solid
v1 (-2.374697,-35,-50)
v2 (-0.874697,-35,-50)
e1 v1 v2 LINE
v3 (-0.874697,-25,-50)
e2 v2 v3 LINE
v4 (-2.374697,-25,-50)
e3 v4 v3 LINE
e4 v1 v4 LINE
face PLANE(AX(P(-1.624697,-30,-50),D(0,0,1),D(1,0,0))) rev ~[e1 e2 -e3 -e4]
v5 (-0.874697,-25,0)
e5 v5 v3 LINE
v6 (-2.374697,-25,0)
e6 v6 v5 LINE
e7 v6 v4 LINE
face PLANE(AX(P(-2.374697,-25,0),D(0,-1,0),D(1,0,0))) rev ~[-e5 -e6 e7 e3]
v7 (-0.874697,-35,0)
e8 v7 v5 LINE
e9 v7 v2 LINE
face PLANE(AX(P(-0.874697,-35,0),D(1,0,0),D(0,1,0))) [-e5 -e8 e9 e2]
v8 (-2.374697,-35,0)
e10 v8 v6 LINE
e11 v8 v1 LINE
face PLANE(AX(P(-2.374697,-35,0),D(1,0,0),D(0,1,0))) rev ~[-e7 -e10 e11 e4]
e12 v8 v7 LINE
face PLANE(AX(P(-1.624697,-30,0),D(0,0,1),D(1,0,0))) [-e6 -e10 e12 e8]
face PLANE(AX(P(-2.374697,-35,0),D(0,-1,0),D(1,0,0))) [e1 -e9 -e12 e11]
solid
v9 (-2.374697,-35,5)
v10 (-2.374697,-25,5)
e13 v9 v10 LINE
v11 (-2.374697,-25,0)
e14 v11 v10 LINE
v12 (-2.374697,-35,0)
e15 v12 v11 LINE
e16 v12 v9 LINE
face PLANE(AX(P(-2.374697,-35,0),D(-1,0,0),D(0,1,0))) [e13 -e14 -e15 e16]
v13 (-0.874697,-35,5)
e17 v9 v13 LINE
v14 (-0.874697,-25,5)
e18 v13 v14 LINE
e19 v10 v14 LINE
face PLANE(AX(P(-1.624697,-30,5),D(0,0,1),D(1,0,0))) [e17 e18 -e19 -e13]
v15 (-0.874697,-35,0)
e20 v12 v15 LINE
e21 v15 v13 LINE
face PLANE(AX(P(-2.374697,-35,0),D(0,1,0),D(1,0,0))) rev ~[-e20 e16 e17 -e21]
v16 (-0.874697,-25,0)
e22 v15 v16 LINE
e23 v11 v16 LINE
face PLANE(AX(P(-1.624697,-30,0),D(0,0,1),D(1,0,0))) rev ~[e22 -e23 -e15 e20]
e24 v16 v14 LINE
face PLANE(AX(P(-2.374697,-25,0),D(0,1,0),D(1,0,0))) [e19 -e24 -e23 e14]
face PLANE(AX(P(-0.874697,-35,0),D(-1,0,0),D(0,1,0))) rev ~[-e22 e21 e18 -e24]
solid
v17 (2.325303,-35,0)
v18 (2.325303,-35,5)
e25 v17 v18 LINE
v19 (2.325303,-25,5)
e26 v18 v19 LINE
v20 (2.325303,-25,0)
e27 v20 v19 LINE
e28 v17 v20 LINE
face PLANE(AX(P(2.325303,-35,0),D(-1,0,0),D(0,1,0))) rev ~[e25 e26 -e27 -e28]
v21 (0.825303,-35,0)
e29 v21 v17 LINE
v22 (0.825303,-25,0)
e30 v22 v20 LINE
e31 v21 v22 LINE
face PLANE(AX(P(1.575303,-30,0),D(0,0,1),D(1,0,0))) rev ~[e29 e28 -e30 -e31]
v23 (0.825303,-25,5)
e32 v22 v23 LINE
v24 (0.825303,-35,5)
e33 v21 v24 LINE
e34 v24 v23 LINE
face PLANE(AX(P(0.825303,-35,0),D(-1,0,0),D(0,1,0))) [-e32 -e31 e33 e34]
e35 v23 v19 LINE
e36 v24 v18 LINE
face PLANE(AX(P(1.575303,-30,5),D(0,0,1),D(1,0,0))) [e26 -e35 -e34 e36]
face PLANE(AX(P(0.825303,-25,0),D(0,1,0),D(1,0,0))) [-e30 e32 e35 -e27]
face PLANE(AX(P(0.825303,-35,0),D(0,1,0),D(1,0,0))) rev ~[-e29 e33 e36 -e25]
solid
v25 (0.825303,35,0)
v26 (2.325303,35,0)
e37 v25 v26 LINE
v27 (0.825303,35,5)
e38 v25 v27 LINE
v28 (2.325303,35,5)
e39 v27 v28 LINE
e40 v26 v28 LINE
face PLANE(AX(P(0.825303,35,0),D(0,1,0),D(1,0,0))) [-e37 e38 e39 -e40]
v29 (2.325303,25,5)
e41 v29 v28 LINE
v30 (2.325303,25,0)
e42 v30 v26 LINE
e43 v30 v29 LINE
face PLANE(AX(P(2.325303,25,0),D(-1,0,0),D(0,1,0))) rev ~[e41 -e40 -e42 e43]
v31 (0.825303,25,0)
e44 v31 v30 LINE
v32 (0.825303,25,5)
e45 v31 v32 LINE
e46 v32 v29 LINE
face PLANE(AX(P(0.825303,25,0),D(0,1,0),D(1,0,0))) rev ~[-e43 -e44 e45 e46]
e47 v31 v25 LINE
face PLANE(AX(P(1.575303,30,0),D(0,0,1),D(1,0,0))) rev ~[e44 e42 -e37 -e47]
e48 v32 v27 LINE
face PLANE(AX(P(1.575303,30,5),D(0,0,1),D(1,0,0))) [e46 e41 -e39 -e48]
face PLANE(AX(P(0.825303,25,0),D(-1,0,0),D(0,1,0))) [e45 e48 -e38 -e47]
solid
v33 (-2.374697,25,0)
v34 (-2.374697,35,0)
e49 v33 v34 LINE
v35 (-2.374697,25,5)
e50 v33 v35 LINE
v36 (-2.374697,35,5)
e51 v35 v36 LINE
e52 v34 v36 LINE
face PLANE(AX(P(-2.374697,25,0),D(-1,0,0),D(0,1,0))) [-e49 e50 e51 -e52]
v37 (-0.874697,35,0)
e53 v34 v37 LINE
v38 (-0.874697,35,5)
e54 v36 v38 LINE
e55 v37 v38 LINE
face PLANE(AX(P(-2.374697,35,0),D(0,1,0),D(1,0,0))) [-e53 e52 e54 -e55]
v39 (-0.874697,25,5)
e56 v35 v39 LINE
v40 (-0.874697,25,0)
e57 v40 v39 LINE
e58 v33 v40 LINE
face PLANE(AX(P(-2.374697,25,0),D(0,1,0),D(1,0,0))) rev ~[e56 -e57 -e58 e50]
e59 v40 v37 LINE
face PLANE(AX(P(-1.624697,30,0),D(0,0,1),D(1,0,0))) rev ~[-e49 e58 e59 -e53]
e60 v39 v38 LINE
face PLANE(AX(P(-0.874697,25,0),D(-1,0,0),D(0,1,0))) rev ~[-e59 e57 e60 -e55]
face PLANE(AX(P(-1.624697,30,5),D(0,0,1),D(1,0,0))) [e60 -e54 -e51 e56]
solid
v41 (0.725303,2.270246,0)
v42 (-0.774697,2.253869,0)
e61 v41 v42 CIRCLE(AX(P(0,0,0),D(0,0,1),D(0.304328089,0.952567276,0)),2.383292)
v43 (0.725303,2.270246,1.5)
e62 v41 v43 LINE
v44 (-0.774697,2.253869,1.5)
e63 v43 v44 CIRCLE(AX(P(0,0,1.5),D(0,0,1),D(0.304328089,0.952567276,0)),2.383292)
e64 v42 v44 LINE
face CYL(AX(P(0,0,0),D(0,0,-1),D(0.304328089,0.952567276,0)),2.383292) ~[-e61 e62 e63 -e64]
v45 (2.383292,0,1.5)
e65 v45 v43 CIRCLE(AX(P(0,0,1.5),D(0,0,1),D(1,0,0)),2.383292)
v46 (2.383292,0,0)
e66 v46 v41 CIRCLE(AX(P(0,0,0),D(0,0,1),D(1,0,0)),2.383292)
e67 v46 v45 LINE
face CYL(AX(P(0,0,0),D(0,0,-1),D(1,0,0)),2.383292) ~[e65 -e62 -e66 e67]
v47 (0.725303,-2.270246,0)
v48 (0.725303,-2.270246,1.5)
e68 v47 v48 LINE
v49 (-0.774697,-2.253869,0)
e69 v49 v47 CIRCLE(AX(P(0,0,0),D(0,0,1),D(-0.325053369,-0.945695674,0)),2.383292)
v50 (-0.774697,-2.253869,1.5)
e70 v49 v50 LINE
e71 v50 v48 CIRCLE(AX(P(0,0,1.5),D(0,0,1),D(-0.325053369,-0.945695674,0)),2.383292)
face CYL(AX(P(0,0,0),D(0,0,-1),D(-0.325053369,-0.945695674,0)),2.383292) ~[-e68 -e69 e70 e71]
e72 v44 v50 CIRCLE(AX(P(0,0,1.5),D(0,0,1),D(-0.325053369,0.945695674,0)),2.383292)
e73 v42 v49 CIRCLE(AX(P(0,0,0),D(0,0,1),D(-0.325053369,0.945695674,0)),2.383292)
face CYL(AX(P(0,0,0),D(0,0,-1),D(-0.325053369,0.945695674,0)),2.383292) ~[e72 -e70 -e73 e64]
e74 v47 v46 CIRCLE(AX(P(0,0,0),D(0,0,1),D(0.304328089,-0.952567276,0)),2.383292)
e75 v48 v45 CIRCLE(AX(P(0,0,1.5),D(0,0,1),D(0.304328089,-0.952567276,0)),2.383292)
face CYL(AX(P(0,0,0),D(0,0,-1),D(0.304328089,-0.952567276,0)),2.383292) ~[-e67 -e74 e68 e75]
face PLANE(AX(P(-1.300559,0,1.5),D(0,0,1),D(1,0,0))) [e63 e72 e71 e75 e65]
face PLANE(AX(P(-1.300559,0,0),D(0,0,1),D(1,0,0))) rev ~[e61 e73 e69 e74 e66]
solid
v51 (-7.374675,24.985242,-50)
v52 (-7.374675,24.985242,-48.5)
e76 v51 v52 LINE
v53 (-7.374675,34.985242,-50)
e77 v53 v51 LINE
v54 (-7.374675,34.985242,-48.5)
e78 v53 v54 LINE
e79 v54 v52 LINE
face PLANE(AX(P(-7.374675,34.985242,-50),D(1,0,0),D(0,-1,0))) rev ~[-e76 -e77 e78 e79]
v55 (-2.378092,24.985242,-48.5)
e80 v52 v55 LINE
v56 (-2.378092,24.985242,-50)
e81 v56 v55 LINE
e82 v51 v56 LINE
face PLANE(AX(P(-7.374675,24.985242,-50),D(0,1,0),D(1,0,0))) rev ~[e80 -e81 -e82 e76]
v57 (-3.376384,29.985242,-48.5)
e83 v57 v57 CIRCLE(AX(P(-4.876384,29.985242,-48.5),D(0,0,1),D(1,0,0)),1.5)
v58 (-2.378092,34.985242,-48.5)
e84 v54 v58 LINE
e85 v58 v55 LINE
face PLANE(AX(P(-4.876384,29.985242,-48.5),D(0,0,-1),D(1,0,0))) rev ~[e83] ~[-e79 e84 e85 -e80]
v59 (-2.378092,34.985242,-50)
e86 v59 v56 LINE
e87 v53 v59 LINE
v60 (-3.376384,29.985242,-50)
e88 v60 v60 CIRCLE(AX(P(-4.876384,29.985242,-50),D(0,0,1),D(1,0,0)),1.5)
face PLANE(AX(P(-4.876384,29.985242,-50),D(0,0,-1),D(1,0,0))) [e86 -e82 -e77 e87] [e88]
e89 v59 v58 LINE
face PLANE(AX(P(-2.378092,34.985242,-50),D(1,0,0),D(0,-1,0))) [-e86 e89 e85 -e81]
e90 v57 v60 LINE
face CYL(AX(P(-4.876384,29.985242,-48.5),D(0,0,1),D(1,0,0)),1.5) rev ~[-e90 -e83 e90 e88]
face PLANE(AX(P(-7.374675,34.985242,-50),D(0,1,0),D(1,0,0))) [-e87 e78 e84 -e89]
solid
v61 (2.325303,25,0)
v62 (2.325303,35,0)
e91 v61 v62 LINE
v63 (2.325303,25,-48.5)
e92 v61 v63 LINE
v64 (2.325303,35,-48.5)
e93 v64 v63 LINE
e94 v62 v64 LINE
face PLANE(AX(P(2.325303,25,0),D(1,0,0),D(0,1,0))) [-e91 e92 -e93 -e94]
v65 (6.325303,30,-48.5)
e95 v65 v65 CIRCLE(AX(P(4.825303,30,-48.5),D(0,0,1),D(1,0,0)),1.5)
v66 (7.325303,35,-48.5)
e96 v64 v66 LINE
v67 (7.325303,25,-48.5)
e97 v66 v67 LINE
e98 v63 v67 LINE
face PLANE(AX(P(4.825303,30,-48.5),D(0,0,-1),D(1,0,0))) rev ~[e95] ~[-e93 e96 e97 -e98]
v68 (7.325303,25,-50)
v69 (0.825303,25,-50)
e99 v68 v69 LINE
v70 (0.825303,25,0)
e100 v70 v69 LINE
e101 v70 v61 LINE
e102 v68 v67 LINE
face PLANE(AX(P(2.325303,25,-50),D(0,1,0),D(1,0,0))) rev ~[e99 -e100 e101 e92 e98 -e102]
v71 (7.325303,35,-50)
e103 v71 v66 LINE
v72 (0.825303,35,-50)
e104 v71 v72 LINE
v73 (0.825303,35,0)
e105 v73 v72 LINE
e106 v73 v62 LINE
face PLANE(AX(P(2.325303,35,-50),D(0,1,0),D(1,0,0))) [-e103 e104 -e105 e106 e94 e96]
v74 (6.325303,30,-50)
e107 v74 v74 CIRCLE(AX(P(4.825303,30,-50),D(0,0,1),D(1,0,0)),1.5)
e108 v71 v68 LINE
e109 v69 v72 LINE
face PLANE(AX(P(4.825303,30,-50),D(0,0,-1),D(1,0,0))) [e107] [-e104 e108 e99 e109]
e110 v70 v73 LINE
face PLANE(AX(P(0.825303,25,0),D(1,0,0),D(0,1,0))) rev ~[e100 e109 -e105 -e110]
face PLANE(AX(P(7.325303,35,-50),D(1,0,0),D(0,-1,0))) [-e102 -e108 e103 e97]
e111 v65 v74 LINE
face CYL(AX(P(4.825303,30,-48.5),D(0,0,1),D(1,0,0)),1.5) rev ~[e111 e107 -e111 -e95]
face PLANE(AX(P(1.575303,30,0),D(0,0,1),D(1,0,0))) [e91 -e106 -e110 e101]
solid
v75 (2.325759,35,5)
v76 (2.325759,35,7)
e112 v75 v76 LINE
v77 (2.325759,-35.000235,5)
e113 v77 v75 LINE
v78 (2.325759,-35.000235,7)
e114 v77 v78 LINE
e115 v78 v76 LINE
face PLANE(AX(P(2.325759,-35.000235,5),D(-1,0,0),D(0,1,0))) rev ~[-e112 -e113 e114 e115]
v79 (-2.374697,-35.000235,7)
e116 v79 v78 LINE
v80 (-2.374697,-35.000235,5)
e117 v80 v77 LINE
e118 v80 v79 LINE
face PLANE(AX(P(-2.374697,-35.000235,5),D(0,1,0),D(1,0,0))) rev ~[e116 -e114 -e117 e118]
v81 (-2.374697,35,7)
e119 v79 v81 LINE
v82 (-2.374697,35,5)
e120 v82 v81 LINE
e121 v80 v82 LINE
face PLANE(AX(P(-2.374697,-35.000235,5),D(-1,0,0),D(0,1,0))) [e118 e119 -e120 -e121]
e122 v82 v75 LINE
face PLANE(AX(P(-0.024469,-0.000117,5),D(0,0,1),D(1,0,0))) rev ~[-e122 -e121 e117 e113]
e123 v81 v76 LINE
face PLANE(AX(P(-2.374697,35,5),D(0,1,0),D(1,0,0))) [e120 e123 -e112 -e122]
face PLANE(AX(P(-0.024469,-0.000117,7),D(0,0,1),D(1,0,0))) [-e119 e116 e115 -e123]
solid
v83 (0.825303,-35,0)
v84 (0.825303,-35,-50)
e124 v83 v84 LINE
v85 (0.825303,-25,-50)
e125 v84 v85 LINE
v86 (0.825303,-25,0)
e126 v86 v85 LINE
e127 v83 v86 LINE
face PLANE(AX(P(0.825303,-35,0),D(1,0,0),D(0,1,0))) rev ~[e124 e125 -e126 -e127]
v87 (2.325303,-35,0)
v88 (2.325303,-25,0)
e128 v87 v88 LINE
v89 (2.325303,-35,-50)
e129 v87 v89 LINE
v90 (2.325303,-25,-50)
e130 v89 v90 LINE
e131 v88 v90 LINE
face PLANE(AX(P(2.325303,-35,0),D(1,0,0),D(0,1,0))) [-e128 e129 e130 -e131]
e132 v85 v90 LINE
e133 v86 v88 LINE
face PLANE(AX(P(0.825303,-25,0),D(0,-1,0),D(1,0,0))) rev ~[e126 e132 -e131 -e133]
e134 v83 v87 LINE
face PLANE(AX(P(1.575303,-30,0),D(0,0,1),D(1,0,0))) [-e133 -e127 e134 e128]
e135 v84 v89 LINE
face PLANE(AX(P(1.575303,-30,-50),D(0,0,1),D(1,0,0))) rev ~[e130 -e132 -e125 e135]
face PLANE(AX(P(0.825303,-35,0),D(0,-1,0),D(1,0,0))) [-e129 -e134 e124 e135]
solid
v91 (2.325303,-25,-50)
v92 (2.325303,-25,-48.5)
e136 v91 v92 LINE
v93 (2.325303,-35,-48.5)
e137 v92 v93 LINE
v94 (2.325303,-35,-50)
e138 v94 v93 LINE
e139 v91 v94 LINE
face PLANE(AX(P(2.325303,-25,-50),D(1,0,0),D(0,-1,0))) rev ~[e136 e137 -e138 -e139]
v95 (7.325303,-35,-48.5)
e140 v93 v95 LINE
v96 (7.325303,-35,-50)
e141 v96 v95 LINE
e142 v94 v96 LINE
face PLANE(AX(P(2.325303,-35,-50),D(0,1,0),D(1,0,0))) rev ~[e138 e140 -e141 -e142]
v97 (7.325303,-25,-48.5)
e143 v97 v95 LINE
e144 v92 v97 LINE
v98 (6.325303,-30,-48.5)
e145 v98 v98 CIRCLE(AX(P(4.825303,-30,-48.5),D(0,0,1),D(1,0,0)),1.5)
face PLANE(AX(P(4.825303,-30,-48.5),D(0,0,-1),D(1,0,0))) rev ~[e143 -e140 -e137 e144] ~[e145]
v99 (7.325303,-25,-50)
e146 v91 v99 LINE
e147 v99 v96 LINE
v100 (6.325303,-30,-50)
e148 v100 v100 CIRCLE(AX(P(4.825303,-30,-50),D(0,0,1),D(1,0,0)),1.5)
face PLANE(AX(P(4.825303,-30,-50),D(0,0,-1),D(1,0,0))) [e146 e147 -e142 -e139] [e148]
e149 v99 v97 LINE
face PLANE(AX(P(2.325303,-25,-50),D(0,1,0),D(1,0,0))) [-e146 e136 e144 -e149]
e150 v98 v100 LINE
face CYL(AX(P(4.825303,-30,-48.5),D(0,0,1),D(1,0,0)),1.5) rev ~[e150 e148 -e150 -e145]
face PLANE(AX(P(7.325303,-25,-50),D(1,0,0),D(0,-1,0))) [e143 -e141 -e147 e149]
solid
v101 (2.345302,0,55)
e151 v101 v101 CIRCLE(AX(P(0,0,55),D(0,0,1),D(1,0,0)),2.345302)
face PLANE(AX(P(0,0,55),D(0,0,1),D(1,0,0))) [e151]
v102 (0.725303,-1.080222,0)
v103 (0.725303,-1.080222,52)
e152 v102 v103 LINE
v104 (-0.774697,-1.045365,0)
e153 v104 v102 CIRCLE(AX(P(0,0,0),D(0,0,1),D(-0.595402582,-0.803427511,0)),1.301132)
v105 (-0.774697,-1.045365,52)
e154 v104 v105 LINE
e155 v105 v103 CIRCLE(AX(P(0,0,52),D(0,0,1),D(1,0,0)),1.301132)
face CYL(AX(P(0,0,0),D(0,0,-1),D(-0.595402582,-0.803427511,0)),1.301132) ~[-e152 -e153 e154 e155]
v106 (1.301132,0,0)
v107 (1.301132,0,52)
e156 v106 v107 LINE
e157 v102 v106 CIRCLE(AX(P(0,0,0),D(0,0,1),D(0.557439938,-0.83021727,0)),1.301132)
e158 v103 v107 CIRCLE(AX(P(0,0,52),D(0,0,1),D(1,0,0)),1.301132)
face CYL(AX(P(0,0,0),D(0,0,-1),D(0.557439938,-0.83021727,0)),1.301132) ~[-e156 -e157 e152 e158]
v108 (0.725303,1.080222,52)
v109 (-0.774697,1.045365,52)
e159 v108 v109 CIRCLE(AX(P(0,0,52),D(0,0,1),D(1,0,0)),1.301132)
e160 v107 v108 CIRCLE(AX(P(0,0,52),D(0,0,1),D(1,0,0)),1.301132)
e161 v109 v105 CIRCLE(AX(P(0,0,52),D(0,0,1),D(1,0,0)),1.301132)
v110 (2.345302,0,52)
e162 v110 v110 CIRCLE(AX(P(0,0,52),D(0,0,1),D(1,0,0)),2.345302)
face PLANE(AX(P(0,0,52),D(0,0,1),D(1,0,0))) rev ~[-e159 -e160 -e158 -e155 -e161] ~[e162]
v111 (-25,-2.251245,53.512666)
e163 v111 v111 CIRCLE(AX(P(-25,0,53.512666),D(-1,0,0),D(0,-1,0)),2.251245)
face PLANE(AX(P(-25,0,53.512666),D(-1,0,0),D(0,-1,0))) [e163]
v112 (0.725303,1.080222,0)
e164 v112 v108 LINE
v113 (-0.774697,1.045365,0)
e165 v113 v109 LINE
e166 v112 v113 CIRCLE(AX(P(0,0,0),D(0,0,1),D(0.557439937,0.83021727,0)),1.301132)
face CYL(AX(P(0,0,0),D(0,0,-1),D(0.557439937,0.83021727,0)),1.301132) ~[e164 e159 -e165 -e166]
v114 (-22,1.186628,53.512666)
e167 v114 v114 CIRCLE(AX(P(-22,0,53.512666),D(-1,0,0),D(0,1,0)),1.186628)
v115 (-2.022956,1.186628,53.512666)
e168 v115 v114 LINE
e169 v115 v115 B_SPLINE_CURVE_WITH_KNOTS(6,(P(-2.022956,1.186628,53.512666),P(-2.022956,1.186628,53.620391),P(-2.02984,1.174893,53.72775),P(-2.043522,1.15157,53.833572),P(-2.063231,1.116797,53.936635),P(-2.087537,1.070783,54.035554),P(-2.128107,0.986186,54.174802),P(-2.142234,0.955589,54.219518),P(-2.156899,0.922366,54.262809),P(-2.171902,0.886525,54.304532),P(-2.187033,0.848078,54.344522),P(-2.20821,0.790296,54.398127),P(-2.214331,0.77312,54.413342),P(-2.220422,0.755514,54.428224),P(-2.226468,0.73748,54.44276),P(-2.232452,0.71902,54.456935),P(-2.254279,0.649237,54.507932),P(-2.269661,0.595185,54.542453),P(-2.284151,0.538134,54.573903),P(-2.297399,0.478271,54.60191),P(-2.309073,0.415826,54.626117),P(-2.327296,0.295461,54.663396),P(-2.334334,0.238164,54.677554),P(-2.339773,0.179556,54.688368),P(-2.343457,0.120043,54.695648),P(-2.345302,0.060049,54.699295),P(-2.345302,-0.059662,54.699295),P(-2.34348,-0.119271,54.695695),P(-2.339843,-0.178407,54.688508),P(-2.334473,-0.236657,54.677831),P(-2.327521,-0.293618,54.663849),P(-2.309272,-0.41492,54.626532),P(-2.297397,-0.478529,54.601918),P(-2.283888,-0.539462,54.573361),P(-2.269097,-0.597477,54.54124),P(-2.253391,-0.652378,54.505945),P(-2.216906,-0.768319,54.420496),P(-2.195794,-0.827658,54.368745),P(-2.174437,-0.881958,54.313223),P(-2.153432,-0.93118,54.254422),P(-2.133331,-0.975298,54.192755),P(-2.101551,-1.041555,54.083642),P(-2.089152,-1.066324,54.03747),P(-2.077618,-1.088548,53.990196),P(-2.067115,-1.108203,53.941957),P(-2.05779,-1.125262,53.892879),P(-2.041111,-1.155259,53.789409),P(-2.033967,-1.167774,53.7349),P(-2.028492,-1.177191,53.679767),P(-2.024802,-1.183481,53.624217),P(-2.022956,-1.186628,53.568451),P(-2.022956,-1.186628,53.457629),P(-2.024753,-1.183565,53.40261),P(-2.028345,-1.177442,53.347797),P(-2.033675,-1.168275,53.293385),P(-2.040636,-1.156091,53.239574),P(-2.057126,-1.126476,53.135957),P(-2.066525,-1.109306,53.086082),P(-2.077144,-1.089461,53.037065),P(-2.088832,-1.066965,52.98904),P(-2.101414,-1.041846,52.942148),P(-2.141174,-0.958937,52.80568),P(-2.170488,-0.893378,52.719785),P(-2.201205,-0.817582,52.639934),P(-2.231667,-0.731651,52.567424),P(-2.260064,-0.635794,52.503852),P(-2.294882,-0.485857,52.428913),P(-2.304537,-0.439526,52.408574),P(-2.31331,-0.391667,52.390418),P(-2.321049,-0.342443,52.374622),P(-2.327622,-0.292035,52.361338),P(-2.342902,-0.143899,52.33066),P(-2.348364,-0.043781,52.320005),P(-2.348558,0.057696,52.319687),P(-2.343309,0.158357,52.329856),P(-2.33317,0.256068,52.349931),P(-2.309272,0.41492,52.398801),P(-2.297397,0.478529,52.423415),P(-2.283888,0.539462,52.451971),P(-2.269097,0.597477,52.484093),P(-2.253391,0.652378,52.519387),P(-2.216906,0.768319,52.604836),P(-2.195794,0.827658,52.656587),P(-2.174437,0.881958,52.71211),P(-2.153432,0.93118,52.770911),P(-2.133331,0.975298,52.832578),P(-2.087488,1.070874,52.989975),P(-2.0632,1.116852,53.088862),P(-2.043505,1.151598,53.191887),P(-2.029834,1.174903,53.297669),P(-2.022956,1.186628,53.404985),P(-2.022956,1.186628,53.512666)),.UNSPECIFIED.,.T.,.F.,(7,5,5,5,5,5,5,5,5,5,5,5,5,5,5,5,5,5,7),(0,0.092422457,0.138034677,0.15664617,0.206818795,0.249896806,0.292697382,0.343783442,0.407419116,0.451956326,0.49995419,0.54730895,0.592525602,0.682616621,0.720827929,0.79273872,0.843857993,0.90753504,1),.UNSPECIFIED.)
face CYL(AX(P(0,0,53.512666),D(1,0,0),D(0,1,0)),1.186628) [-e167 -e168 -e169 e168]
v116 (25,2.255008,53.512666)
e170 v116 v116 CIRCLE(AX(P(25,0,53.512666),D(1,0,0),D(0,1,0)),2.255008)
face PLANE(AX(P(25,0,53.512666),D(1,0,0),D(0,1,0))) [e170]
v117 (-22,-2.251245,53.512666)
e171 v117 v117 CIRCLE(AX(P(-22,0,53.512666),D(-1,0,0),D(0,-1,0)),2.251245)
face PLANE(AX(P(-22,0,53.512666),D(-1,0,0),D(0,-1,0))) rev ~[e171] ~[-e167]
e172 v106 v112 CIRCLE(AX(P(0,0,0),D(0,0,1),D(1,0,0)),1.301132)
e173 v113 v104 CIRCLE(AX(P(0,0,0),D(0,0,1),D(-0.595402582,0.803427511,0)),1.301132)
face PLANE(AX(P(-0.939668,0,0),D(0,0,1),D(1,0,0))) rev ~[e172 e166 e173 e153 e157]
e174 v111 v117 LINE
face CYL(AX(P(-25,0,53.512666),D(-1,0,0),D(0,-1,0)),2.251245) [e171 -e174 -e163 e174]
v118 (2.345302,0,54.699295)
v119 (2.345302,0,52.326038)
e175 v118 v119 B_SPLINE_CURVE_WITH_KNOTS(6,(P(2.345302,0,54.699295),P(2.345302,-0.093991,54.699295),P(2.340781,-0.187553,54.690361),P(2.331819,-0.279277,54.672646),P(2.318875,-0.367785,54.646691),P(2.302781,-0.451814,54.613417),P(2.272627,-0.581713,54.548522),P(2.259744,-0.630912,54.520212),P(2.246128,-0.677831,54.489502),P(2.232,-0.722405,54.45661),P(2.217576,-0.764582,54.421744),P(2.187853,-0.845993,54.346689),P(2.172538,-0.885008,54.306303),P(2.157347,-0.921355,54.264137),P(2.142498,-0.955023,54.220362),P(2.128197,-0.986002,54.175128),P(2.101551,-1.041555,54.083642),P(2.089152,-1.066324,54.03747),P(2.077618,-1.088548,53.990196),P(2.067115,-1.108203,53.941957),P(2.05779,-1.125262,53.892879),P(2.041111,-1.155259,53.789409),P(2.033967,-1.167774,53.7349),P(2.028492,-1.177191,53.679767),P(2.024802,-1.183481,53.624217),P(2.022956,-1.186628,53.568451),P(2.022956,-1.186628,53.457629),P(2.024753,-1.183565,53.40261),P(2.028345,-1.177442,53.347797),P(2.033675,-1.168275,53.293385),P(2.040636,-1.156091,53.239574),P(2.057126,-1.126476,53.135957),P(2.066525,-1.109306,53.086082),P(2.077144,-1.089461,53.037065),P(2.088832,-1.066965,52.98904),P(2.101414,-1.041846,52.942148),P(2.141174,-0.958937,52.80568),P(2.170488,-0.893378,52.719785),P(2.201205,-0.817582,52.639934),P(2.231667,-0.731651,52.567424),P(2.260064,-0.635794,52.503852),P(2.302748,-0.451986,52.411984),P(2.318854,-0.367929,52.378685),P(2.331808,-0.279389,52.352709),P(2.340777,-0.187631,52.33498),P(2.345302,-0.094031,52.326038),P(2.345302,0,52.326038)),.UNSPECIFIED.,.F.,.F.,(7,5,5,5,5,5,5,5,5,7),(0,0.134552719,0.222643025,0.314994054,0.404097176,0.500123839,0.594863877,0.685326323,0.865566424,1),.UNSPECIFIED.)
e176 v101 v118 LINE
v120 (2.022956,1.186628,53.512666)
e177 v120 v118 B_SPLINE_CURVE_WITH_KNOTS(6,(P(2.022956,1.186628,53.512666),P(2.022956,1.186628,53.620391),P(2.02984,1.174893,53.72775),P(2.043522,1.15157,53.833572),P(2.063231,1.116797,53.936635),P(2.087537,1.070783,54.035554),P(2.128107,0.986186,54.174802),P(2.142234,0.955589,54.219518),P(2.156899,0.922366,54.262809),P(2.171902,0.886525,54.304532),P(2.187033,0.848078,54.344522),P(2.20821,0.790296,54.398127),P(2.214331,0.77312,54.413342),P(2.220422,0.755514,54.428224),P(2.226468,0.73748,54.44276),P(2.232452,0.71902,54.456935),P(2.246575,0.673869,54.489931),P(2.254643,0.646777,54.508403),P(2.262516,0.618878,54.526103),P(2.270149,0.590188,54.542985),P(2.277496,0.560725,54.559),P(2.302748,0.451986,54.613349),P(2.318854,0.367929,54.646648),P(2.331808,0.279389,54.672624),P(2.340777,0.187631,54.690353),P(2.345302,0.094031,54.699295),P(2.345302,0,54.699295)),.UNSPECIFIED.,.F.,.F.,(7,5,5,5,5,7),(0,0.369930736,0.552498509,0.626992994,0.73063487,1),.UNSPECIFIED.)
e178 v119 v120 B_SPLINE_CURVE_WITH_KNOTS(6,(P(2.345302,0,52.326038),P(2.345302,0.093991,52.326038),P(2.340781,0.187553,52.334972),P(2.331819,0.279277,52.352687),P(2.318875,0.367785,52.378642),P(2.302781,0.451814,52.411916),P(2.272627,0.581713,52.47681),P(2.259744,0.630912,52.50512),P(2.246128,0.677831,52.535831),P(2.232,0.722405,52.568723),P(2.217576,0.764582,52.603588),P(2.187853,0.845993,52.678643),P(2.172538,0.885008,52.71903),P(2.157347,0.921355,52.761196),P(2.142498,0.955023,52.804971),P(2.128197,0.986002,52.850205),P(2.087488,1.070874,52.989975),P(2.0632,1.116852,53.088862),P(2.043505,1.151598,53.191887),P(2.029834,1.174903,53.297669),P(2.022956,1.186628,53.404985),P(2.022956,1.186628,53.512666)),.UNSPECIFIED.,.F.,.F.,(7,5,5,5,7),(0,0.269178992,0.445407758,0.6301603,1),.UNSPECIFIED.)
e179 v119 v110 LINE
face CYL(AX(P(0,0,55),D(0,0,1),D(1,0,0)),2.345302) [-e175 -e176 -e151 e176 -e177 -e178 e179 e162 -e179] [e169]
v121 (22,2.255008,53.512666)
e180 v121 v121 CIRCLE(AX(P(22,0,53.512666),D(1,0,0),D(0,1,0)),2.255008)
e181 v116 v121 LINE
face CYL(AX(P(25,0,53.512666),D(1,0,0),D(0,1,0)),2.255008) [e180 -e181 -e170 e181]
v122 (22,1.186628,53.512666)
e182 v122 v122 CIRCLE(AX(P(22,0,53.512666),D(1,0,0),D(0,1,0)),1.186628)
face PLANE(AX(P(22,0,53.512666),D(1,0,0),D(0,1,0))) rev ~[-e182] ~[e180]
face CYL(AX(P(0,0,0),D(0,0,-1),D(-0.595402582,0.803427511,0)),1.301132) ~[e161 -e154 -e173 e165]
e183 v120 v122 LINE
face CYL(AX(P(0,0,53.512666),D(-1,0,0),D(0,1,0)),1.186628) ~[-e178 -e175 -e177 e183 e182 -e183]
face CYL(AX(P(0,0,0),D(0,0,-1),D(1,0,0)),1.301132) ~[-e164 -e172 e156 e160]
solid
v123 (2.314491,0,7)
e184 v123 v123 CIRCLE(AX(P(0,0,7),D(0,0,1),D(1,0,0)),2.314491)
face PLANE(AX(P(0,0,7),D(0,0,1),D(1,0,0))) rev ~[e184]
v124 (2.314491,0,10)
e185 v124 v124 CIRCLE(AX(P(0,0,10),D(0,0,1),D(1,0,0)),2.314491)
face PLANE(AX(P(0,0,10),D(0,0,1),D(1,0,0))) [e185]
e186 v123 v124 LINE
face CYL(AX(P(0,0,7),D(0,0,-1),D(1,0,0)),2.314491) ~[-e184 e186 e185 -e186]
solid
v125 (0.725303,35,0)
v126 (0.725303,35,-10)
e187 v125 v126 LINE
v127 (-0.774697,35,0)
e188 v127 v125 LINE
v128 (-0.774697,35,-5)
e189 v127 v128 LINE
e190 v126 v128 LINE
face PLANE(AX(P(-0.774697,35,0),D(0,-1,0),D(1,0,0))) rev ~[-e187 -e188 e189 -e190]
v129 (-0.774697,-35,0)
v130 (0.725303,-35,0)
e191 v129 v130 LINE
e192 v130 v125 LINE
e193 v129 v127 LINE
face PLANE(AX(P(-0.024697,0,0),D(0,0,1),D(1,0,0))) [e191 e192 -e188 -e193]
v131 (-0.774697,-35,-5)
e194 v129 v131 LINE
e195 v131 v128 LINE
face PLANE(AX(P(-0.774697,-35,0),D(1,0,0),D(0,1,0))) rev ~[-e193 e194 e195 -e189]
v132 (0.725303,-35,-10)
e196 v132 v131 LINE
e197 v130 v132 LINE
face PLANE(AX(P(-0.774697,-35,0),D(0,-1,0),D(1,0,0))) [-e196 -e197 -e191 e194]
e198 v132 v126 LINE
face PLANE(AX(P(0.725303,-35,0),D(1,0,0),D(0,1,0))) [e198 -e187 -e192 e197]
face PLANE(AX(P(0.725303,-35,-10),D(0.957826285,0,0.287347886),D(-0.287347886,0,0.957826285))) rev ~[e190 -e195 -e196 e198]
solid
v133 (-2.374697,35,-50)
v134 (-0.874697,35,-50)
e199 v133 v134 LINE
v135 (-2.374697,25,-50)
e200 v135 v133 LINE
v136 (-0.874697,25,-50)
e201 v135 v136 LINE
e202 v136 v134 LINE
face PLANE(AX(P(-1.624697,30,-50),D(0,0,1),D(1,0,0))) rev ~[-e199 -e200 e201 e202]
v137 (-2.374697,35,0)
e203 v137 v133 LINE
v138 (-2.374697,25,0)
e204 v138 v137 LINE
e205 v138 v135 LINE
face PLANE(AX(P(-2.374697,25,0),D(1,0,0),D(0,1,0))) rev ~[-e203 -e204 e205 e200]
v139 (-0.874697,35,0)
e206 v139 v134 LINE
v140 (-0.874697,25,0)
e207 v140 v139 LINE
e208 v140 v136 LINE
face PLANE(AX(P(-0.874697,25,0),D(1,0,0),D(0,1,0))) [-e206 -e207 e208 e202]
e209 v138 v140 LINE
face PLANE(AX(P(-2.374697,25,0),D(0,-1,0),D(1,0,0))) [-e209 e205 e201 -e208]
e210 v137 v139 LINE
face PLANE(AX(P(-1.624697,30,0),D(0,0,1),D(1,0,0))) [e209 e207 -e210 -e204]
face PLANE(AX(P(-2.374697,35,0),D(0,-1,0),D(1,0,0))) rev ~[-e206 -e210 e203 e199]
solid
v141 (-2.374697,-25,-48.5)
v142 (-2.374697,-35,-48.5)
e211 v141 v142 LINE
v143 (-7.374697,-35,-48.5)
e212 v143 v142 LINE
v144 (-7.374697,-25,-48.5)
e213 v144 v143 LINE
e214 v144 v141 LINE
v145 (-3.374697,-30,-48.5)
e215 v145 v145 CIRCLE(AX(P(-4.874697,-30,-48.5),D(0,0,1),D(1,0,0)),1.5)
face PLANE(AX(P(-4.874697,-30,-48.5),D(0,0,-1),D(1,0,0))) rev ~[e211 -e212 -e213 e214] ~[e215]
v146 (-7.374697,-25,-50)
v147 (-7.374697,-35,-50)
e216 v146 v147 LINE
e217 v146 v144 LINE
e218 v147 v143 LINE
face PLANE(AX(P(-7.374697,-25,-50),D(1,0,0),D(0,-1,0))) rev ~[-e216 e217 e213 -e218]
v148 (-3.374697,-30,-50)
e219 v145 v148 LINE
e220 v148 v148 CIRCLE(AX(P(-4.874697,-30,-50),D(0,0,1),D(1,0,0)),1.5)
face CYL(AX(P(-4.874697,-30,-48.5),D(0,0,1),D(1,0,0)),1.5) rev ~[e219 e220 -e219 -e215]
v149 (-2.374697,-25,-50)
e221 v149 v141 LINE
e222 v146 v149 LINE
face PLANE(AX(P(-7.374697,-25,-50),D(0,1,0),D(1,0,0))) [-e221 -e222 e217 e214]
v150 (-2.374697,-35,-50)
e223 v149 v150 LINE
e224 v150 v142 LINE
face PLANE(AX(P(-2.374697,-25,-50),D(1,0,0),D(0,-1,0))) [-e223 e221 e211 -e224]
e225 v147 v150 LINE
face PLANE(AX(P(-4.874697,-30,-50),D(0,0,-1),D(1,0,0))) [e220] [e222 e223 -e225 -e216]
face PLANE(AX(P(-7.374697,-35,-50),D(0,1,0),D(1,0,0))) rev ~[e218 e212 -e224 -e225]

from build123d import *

# Parameters (mm, degrees)
F0_W      = 1.5
F0_H      = 70
F1_DEPTH  = 10
F3_DEPTH  = 70.001
F4_W      = 1.5
F4_H      = 10
F5_DEPTH  = 50
F6_DEPTH  = 5
F7_W      = 4.7004564702
F7_H      = 70.0002348423
F8_DEPTH  = 2
F11_DEPTH = 55
F9_R      = 2.3144907663
F12_DEPTH = 3
F13_R     = 2.3453015316
F13_R_2   = 1.3011317458
F14_DEPTH = 3
F15_R     = 1.186628288
F16_DEPTH = 25
F17_R     = 2.2512446739
F17_R_2   = 1.186628288
F18_DEPTH = 3
F19_DEPTH = 25
F20_R     = 2.2550084993
F20_R_2   = 1.186628288
F21_DEPTH = 3
F22_W     = 5
F22_H     = 10
F23_DEPTH = 1.5
F24_W     = 5
F24_H     = 10
F25_DEPTH = 1.5
F24_W_2   = 4.9965837158
F27_R     = 1.5
F28_DEPTH = 1.501
F26_R     = 1.5
F29_DEPTH = 1.501
F31_R     = 1.5
F32_DEPTH = 1.501
F30_R     = 1.5
F33_DEPTH = 1.501
F35_DEPTH = 1.5


# Not quite as in the source:
# - the program builds the solid bodies; features that only make, move or delete a surface that nothing else refers to are left out


with BuildPart() as f1:
    # F0 (on Top) → F1 (new body)
    with BuildSketch(Plane.XY):
        with Locations((-0.0246972009, 0)):
            Rectangle(F0_W, F0_H)
    extrude(amount=-F1_DEPTH)

    # F2 (on face) → F3 (cut, through all)
    with BuildSketch(Plane.XZ.offset(35)):
        Polygon((0.7253027991, -10), (-0.7746972009, -5), (-0.7746972009, -10), align=None)
    extrude(amount=-F3_DEPTH, mode=Mode.SUBTRACT)


with BuildPart() as f5:
    # F4 (on face) → F5 (new body)
    with BuildSketch(Plane.XY):
        with Locations((1.5753027991, 30)):
            Rectangle(F4_W, F4_H)
    extrude(amount=-F5_DEPTH)

    # F24 (on face) → F25 (join)
    with BuildSketch(Plane(origin=(0, 0, -50), x_dir=(1, 0, 0), z_dir=(0, 0, -1))):
        with Locations((4.8253027991, -30)):
            Rectangle(F24_W, F24_H)
    extrude(amount=-F25_DEPTH)

    # F26 (on face) → F29 (cut, through all)
    with BuildSketch(Plane.XY.offset(-48.5)):
        with Locations((4.8253027991, 30)):
            Circle(F26_R)
    extrude(amount=-F29_DEPTH, mode=Mode.SUBTRACT)


with BuildPart() as f5b:
    # F4 (on face) → F5, piece 2 (new body)
    with BuildSketch(Plane.XY):
        with Locations((-1.6246972009, 30)):
            Rectangle(F4_W, F4_H)
    extrude(amount=-F5_DEPTH)


with BuildPart() as f5c:
    # F4 (on face) → F5, piece 3 (new body)
    with BuildSketch(Plane.XY):
        with Locations((-1.6246972009, -30)):
            Rectangle(F4_W, F4_H)
    extrude(amount=-F5_DEPTH)


with BuildPart() as f5d:
    # F4 (on face) → F5, piece 4 (new body)
    with BuildSketch(Plane.XY):
        with Locations((1.5753027991, -30)):
            Rectangle(F4_W, F4_H)
    extrude(amount=-F5_DEPTH)


with BuildPart() as f6:
    # F4 (on face) → F6 (new body)
    with BuildSketch(Plane.XY):
        with Locations((-1.6246972009, 30)):
            Rectangle(F4_W, F4_H)
    extrude(amount=F6_DEPTH)


with BuildPart() as f6b:
    # F4 (on face) → F6, piece 2 (new body)
    with BuildSketch(Plane.XY):
        with Locations((1.5753027991, 30)):
            Rectangle(F4_W, F4_H)
    extrude(amount=F6_DEPTH)


with BuildPart() as f6c:
    # F4 (on face) → F6, piece 3 (new body)
    with BuildSketch(Plane.XY):
        with Locations((-1.6246972009, -30)):
            Rectangle(F4_W, F4_H)
    extrude(amount=F6_DEPTH)


with BuildPart() as f6d:
    # F4 (on face) → F6, piece 4 (new body)
    with BuildSketch(Plane.XY):
        with Locations((1.5753027991, -30)):
            Rectangle(F4_W, F4_H)
    extrude(amount=F6_DEPTH)


with BuildPart() as f8:
    # F7 (on face) → F8 (new body)
    with BuildSketch(Plane.XY.offset(5)):
        with Locations((-0.0244689658, -0.0001174212)):
            Rectangle(F7_W, F7_H)
    extrude(amount=F8_DEPTH)


with BuildPart() as f11:
    # F10 (on face) → F11 (new body)
    with BuildSketch(Plane.XY):
        with BuildLine():
            Line((-0.7746972009, -1.0453650399), (-0.7746972009, 1.0453650399))
            ThreePointArc((-0.7746972009, 1.0453650399), (-1.3011317458, 0), (-0.7746972009, -1.0453650399))
        make_face()
        with BuildLine():
            ThreePointArc((0.7253027991, -1.0802220464), (1.1481851586, -0.6120577271), (1.3011317458, 0))
            ThreePointArc((1.3011317458, 0), (1.1481851586, 0.6120577271), (0.7253027991, 1.0802220464))
            Line((0.7253027991, 1.0802220464), (0.7253027991, -1.0802220464))
        make_face()
        with BuildLine():
            Line((0.7253027991, -1.0802220464), (0.7253027991, 1.0802220464))
            ThreePointArc((0.7253027991, 1.0802220464), (-0.0302275447, 1.3007805792), (-0.7746972009, 1.0453650399))
            Line((-0.7746972009, 1.0453650399), (-0.7746972009, -1.0453650399))
            ThreePointArc((-0.7746972009, -1.0453650399), (-0.0302275447, -1.3007805792), (0.7253027991, -1.0802220464))
        make_face()
    extrude(amount=F11_DEPTH)

    # F13 (on face) → F14 (join)
    with BuildSketch(Plane.XY.offset(55)):
        Circle(F13_R)
        Circle(F13_R_2, mode=Mode.SUBTRACT)
    extrude(amount=-F14_DEPTH)

    # F15 (on Right) → F16 (join)
    with BuildSketch(Plane.YZ):
        with Locations((0, 53.5126663744)):
            Circle(F15_R)
    extrude(amount=-F16_DEPTH)

    # F17 (on face) → F18 (join)
    with BuildSketch(Plane(origin=(-25, 0, 0), x_dir=(0, -1, 0), z_dir=(-1, 0, 0))):
        with Locations((0, 53.5126663744)):
            Circle(F17_R)
        with Locations((0, 53.5126663744)):
            Circle(F17_R_2, mode=Mode.SUBTRACT)
    extrude(amount=-F18_DEPTH)

    # F15 (on Right) → F19 (join)
    with BuildSketch(Plane.YZ):
        with Locations((0, 53.5126663744)):
            Circle(F15_R)
    extrude(amount=F19_DEPTH)

    # F20 (on face) → F21 (join)
    with BuildSketch(Plane.YZ.offset(25)):
        with Locations((0, 53.5126663744)):
            Circle(F20_R)
        with Locations((0, 53.5126663744)):
            Circle(F20_R_2, mode=Mode.SUBTRACT)
    extrude(amount=-F21_DEPTH)


with BuildPart() as f12:
    # F9 (on face) → F12 (new body)
    with BuildSketch(Plane.XY.offset(7)):
        Circle(F9_R)
    extrude(amount=F12_DEPTH)


with BuildPart() as f23:
    # F22 (on face) → F23 (new body)
    with BuildSketch(Plane(origin=(0, 0, -50), x_dir=(1, 0, 0), z_dir=(0, 0, -1))):
        with Locations((4.8253027991, 30)):
            Rectangle(F22_W, F22_H)
    extrude(amount=-F23_DEPTH)

    # F30 (on face) → F33 (cut, through all)
    with BuildSketch(Plane.XY.offset(-48.5)):
        with Locations((4.8253027991, -30)):
            Circle(F30_R)
    extrude(amount=-F33_DEPTH, mode=Mode.SUBTRACT)


with BuildPart() as f23b:
    # F22 (on face) → F23, piece 2 (new body)
    with BuildSketch(Plane(origin=(0, 0, -50), x_dir=(1, 0, 0), z_dir=(0, 0, -1))):
        with Locations((-4.8746972009, 30)):
            Rectangle(F22_W, F22_H)
    extrude(amount=-F23_DEPTH)

    # F31 (on face) → F32 (cut, through all)
    with BuildSketch(Plane.XY.offset(-48.5)):
        with Locations((-4.8746972009, -30)):
            Circle(F31_R)
    extrude(amount=-F32_DEPTH, mode=Mode.SUBTRACT)


with BuildPart() as f25:
    # F24 (on face) → F25, piece 2 (new body)
    with BuildSketch(Plane(origin=(0, 0, -50), x_dir=(1, 0, 0), z_dir=(0, 0, -1))):
        with Locations((-4.8763835644, -29.9852424113)):
            Rectangle(F24_W_2, F24_H)
    extrude(amount=-F25_DEPTH)

    # F27 (on face) → F28 (cut, through all)
    with BuildSketch(Plane.XY.offset(-48.5)):
        with Locations((-4.8763835644, 29.9852424113)):
            Circle(F27_R)
    extrude(amount=-F28_DEPTH, mode=Mode.SUBTRACT)


with BuildPart() as f35:
    # F34 (on face) → F35 (new body)
    with BuildSketch(Plane.XY):
        with BuildLine():
            Line((-0.7746972009, -2.2538692437), (-0.7746972009, 2.2538692437))
            ThreePointArc((-0.7746972009, 2.2538692437), (-2.383292328, 0), (-0.7746972009, -2.2538692437))
        make_face()
        with BuildLine():
            Line((0.7253027991, -2.2702462797), (0.7253027991, 2.2702462797))
            ThreePointArc((0.7253027991, 2.2702462797), (-0.0260192921, 2.3831502926), (-0.7746972009, 2.2538692437))
            Line((-0.7746972009, 2.2538692437), (-0.7746972009, -2.2538692437))
            ThreePointArc((-0.7746972009, -2.2538692437), (-0.0260192921, -2.3831502926), (0.7253027991, -2.2702462797))
        make_face()
        with BuildLine():
            ThreePointArc((0.7253027991, -2.2702462797), (1.9246676229, -1.4056090716), (2.383292328, 0))
            ThreePointArc((2.383292328, 0), (1.9246676229, 1.4056090716), (0.7253027991, 2.2702462797))
            Line((0.7253027991, 2.2702462797), (0.7253027991, -2.2702462797))
        make_face()
    extrude(amount=F35_DEPTH)


solid = Compound([f1.part, f5.part, f5b.part, f5c.part, f5d.part, f6.part, f6b.part, f6c.part, f6d.part, f8.part, f11.part, f12.part, f23.part, f23b.part, f25.part, f35.part])
